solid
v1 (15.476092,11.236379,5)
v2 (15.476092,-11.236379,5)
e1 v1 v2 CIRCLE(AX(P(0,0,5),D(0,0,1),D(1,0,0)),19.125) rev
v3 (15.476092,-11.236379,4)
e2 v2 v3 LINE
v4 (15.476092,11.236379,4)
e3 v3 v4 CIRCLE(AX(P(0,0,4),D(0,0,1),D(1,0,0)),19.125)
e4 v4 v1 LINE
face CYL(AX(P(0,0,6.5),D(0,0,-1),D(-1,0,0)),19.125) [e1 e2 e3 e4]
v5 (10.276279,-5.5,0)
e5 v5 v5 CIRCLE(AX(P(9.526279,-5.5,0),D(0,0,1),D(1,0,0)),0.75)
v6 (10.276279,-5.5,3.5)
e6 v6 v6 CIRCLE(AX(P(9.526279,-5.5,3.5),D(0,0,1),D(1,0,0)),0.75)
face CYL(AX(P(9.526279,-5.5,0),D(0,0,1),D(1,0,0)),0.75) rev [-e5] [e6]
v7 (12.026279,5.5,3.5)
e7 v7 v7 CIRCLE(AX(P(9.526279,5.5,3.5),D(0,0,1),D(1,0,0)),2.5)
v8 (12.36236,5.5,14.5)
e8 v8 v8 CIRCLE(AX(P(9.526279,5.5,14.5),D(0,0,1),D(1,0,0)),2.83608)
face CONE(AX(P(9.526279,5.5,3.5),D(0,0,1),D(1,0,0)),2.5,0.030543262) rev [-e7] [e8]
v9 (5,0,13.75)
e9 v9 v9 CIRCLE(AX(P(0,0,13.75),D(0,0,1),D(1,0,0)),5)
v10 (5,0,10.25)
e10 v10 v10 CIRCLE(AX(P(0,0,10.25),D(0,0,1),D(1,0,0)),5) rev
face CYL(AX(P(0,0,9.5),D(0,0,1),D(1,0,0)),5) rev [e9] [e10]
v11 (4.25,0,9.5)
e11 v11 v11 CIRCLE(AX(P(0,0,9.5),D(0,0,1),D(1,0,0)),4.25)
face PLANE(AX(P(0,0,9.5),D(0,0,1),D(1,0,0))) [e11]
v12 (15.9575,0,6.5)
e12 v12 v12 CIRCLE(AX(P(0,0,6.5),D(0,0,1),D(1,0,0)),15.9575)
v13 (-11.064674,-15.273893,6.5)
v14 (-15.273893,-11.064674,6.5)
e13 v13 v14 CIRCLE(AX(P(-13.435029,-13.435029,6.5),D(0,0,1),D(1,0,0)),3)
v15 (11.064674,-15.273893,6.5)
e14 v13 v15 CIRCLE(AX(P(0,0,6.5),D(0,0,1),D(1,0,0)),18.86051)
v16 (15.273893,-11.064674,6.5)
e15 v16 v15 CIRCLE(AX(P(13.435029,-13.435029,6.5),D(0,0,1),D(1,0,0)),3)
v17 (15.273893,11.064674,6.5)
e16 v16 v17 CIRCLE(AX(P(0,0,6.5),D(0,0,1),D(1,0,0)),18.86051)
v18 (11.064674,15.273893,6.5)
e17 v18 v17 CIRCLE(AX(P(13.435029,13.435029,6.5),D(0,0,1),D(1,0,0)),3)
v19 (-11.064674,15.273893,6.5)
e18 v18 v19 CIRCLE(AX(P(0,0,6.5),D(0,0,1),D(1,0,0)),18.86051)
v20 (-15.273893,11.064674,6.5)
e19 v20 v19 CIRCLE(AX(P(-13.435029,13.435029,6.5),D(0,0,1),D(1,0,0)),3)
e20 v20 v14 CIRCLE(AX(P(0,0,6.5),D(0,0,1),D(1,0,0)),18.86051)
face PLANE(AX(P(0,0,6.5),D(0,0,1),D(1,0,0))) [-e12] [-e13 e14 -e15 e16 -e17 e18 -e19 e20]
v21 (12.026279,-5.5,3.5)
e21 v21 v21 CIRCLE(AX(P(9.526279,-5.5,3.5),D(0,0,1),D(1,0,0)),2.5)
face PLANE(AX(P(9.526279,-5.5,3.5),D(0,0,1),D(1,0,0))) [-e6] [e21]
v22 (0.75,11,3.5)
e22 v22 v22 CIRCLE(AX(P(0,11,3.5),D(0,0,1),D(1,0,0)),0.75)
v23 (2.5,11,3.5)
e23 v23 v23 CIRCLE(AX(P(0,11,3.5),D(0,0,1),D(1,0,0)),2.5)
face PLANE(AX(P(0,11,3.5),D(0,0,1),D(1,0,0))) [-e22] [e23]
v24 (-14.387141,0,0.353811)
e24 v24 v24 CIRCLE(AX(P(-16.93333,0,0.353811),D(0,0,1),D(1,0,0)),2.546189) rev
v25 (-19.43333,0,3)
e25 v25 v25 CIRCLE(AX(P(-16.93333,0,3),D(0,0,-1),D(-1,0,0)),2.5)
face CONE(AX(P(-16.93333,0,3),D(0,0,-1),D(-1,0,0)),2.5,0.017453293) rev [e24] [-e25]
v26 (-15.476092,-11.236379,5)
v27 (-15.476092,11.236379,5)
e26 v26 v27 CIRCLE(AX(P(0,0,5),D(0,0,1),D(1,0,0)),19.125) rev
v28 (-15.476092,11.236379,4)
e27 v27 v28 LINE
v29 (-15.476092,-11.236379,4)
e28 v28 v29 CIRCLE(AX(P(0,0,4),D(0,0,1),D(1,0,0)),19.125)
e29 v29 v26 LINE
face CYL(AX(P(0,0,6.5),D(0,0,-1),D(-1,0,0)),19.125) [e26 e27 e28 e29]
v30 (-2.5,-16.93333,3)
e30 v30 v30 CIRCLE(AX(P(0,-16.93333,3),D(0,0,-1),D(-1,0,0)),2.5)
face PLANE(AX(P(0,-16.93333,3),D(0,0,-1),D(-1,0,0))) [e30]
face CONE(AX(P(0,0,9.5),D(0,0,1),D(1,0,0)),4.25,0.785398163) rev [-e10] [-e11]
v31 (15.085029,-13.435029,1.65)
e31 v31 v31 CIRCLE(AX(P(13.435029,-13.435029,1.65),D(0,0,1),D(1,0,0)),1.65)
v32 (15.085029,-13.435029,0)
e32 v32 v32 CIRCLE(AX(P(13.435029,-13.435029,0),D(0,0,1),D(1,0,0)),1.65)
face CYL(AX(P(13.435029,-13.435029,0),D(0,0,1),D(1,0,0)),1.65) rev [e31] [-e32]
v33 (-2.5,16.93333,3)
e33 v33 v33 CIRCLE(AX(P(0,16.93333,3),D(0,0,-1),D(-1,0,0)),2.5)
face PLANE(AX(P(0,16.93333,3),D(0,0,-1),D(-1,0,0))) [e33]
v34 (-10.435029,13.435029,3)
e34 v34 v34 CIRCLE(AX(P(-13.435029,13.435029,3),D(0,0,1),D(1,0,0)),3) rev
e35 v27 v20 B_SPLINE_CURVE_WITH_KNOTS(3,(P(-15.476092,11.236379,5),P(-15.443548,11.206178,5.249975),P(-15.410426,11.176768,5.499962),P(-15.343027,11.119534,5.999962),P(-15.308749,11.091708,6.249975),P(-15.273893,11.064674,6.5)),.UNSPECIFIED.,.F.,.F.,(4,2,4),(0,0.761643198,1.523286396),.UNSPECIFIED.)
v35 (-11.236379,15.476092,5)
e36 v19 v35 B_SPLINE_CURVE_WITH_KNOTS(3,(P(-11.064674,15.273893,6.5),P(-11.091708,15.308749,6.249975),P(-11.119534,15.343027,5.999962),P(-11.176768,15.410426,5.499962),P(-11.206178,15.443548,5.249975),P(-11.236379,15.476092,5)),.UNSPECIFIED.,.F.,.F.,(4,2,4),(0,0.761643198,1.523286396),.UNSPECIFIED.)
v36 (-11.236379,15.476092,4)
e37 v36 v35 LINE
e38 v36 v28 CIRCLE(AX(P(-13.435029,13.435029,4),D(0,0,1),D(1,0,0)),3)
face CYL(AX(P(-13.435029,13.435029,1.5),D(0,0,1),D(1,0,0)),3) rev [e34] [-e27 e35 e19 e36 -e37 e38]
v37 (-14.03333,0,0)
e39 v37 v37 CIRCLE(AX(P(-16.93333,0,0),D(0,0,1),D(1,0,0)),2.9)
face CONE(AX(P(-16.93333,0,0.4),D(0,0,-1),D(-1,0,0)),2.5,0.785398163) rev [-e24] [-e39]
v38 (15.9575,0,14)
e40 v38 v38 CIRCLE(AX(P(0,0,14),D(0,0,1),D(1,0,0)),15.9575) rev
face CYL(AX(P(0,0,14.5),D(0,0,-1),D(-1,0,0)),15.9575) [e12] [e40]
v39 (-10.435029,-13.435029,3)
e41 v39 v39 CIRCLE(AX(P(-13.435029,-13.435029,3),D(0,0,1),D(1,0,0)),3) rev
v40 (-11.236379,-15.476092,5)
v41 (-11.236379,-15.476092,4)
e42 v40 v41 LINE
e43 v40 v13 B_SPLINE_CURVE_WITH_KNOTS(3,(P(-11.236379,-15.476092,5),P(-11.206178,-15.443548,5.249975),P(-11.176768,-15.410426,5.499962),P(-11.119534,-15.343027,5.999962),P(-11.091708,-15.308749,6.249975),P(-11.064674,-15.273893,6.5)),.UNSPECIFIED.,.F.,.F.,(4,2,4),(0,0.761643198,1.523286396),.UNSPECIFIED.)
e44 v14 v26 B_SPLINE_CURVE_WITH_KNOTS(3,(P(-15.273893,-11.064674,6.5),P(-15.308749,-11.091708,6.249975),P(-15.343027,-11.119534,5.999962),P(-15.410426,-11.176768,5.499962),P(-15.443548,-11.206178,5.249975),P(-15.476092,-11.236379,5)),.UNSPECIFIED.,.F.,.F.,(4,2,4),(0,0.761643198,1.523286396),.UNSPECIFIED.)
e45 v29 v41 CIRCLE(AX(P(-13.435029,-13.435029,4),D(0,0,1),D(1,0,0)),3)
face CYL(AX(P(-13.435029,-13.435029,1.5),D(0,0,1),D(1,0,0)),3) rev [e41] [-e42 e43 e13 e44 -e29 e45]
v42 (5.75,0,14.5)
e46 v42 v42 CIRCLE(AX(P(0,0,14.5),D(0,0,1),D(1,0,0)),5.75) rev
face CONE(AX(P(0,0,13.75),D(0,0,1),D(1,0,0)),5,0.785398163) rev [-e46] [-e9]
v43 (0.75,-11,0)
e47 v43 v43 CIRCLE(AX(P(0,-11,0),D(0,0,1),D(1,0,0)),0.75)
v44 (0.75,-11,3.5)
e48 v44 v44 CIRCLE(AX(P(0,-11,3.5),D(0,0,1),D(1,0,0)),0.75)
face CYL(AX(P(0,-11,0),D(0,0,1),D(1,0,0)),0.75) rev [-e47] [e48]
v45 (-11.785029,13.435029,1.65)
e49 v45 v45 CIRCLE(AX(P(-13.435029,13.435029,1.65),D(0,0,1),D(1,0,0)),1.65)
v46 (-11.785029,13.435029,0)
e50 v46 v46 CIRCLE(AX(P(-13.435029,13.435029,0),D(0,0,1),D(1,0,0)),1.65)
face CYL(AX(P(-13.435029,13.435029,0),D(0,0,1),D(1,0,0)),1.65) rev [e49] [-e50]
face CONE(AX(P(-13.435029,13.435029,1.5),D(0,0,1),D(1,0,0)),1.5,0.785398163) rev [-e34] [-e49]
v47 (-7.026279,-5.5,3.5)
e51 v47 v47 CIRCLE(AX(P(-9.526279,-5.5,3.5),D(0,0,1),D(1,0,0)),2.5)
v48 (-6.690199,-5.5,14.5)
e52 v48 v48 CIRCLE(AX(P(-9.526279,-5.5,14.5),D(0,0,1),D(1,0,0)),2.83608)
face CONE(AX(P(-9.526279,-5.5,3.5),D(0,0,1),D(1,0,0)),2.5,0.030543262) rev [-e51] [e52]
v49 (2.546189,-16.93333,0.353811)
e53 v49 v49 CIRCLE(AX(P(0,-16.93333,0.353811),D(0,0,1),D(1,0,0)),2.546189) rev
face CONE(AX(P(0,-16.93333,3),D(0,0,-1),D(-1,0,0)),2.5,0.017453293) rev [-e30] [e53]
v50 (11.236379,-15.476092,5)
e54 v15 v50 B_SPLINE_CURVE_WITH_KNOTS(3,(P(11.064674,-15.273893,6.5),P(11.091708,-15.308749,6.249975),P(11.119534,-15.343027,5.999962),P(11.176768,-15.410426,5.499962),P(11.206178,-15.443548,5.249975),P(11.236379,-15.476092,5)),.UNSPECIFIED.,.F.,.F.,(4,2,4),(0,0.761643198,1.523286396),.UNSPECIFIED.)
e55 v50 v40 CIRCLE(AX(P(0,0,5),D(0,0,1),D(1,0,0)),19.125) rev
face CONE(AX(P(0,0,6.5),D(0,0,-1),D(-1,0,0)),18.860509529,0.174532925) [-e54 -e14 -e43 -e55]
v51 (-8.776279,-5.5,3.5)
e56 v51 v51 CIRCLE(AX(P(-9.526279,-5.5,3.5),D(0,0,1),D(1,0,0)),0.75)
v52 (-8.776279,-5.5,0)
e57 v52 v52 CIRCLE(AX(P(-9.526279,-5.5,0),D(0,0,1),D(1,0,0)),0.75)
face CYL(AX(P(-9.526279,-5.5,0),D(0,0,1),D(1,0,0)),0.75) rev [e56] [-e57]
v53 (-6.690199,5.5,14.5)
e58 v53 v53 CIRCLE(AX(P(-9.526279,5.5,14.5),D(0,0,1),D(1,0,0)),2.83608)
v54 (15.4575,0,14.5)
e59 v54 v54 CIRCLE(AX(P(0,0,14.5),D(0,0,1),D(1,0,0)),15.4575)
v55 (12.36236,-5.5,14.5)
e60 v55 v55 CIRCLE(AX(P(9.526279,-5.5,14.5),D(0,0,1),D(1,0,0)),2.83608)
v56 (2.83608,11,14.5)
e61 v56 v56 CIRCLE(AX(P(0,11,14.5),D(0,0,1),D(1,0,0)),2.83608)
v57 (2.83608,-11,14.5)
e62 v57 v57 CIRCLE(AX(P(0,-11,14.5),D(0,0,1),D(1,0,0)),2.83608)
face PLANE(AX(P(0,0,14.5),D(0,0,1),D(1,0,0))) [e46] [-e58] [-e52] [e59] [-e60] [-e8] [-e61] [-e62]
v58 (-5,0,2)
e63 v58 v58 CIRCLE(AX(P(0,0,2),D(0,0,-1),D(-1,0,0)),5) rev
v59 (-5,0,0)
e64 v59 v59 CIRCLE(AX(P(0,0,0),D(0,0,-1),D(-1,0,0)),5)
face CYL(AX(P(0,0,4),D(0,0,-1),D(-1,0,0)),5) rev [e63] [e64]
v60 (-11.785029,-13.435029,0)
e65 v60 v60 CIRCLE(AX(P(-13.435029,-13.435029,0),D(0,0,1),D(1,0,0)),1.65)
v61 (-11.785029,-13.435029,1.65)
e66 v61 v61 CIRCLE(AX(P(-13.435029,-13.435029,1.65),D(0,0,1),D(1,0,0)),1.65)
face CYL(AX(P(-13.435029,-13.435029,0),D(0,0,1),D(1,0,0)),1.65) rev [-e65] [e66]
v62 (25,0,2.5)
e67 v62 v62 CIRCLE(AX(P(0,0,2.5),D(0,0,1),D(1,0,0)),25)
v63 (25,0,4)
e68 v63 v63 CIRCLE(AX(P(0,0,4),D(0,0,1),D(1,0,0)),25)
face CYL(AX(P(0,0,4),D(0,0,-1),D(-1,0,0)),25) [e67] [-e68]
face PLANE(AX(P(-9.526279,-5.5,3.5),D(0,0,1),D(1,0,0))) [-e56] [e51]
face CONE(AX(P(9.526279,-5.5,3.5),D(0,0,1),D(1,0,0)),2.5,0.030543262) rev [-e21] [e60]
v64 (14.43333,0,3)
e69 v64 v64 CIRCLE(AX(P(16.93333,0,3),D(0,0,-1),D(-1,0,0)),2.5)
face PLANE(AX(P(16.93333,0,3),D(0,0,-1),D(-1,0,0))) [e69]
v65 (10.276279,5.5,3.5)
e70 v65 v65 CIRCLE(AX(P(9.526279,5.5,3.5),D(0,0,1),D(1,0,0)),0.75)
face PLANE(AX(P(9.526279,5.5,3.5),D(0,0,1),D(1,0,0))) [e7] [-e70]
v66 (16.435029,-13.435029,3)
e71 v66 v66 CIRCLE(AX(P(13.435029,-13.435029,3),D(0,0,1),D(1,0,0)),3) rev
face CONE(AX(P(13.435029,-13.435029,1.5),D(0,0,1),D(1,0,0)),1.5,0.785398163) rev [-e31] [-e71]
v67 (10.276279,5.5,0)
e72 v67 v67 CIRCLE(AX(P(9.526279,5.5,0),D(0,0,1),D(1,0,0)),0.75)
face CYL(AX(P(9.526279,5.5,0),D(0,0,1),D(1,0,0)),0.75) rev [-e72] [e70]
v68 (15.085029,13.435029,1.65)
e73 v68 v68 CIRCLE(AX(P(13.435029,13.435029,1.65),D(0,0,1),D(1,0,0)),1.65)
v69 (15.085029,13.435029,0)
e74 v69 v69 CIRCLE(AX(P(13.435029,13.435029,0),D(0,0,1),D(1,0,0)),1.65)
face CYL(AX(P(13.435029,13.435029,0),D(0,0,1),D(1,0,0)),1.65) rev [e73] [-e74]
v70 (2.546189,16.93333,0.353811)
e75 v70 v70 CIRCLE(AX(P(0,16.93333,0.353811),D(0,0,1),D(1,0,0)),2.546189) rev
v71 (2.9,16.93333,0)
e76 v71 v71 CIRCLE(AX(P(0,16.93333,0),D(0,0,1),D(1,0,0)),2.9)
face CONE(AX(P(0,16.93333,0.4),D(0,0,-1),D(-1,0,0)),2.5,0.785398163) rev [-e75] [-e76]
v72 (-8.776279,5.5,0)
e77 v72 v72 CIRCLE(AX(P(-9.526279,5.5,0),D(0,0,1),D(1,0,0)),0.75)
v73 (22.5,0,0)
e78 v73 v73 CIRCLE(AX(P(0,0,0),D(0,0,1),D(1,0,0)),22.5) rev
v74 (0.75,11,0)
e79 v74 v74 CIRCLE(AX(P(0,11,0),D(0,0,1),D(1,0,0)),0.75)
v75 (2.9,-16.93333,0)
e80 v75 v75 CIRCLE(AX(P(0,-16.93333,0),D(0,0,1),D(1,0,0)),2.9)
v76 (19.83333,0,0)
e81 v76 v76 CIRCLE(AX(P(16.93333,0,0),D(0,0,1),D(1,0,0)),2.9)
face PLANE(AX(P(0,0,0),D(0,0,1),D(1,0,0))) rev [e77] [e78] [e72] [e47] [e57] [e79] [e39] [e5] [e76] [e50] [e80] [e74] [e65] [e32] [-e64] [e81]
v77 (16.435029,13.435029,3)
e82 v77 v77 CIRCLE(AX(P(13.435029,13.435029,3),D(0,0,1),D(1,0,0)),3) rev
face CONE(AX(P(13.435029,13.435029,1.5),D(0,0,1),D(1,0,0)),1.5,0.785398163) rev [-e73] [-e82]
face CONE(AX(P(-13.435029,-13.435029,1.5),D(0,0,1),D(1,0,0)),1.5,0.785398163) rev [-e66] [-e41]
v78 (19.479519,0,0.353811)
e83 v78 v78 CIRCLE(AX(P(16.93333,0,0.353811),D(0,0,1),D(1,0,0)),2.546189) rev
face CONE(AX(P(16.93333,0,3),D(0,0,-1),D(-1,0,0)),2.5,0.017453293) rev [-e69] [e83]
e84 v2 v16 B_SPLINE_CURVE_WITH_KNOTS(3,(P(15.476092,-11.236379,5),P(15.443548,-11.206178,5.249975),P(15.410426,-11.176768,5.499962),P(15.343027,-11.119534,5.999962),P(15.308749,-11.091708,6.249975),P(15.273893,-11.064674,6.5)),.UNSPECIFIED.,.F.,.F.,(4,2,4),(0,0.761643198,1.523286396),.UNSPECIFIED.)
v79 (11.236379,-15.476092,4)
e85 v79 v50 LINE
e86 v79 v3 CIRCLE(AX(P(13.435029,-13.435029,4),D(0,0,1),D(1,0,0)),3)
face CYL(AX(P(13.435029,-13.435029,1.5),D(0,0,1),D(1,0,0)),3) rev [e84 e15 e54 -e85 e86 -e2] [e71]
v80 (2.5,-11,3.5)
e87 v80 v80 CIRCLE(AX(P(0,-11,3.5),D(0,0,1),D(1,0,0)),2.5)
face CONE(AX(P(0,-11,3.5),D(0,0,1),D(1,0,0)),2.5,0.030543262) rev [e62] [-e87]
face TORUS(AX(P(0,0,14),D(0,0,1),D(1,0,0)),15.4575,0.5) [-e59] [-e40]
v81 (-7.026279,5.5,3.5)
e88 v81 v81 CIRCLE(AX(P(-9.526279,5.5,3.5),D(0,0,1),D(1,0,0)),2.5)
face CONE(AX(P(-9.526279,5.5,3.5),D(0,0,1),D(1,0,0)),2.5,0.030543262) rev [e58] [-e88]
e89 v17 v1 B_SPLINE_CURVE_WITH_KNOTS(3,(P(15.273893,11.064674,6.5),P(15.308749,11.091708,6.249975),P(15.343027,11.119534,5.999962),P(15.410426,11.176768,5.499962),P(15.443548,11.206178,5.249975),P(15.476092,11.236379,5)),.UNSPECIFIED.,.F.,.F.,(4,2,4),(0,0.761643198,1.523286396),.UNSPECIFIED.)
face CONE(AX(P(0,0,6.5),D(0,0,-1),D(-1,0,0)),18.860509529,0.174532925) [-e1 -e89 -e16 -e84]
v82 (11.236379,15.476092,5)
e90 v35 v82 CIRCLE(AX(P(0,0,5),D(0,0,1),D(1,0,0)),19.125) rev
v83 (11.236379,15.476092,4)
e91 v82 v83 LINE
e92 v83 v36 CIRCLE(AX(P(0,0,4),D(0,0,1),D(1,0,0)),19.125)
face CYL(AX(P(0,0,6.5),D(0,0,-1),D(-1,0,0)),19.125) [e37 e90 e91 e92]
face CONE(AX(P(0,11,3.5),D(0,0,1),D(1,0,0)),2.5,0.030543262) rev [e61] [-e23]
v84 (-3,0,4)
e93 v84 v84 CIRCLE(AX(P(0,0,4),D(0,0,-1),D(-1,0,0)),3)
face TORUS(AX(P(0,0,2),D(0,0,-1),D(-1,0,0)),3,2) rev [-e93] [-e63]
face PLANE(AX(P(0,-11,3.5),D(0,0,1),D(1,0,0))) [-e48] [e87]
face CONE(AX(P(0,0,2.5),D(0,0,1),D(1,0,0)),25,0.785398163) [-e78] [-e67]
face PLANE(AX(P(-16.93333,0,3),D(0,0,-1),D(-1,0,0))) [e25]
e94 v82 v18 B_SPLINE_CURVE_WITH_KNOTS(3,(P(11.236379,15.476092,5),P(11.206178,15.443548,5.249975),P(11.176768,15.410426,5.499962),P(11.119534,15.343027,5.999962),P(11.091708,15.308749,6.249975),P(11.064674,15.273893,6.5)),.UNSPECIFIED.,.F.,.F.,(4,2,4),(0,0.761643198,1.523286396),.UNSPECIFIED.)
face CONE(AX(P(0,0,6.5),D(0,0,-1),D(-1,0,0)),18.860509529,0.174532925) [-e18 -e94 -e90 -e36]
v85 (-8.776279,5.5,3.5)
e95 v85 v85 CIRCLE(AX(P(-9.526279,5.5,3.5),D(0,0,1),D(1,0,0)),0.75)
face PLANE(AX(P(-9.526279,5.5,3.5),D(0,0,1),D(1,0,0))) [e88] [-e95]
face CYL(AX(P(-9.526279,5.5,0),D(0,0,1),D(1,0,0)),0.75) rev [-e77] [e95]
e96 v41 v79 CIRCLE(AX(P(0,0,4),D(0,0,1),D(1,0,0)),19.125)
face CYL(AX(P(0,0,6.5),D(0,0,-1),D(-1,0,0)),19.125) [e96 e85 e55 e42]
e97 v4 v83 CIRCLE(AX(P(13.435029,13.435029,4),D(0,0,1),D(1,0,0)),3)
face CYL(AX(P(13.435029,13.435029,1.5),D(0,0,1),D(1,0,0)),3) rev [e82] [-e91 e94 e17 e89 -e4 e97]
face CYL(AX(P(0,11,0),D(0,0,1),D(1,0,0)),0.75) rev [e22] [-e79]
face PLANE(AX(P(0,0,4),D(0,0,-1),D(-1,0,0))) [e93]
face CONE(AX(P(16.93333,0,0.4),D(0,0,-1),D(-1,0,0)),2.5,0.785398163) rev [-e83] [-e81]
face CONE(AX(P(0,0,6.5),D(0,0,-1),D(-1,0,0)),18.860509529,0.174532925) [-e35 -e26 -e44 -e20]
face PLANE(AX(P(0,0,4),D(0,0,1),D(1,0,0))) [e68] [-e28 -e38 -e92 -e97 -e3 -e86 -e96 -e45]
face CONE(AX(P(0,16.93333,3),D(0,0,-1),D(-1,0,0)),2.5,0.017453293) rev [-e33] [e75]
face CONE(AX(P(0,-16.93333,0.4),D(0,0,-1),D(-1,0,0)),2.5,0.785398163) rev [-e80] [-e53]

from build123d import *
from OCP.BRepFilletAPI import BRepFilletAPI_MakeChamfer

# Parameters (mm, degrees)
SKETCH1_R               = 25
BOSS_EXTRUDE1_DEPTH     = 4
SKETCH2_R               = 19.125
BOSS_EXTRUDE2_DEPTH     = 2.5
SKETCH3_R               = 15.9575
BOSS_EXTRUDE3_DEPTH     = 8
SKETCH4_R               = 2.5
CUT_EXTRUDE1_DEPTH      = 3
SKETCH7_R               = 2.5
CUT_EXTRUDE3_DEPTH      = 11
SKETCH8_R               = 5
CUT_EXTRUDE4_DEPTH      = 4
CHAMFER1_SIZE           = 2.5
FILLET1_R               = 0.5
CUT_EXTRUDE7_DEPTH      = 37.881567212
CUT_EXTRUDE7_DEPTH_BACK = 37.881567212
SKETCH11_R              = 1.65
SKETCH12_R              = 3
CUT_EXTRUDE8_DEPTH      = 5
CUT_EXTRUDE11_START     = -5
SKETCH15_R              = 5
CUT_EXTRUDE11_DEPTH     = 5
CHAMFER2_SIZE           = 1.5
FILLET2_R               = 2
CHAMFER3_SIZE           = 1.5
CHAMFER3_SIZE2          = 0.264490471
CHAMFER4_SIZE           = 0.75
CHAMFER5_SIZE           = 0.75
SKETCH16_R              = 0.75
CUT_EXTRUDE12_DEPTH     = 38.027017163
CHAMFER6_SIZE           = 0.4
DRAFT1_ANGLE            = 1.75
DRAFT2_ANGLE            = 1


with BuildPart() as part:
    # Sketch1 → Boss-Extrude1 (new body)
    with BuildSketch(Plane.XY):
        Circle(SKETCH1_R)
    extrude(amount=BOSS_EXTRUDE1_DEPTH)

    # Sketch2 → Boss-Extrude2 (add)
    with BuildSketch(Plane.XY.offset(4)):
        Circle(SKETCH2_R)
    extrude(amount=BOSS_EXTRUDE2_DEPTH)

    # Sketch3 → Boss-Extrude3 (add)
    with BuildSketch(Plane.XY.offset(6.5)):
        Circle(SKETCH3_R)
    extrude(amount=BOSS_EXTRUDE3_DEPTH)

    # Sketch4 → Cut-Extrude1 (cut)
    with BuildSketch(Plane(origin=(0, 0, 0), x_dir=(-1, 0, 0), z_dir=(0, 0, -1))):
        with Locations((0, 16.93333)):
            Circle(SKETCH4_R)
        with Locations((16.93333, 0)):
            Circle(SKETCH4_R)
        with Locations((0, -16.93333)):
            Circle(SKETCH4_R)
        with Locations((-16.93333, 0)):
            Circle(SKETCH4_R)
    extrude(amount=-CUT_EXTRUDE1_DEPTH, mode=Mode.SUBTRACT)

    # Sketch7 → Cut-Extrude3 (cut)
    with BuildSketch(Plane.XY.offset(14.5)):
        with Locations((0, 11)):
            Circle(SKETCH7_R)
        with Locations((9.526279442, 5.5)):
            Circle(SKETCH7_R)
        with Locations((9.526279442, -5.5)):
            Circle(SKETCH7_R)
        with Locations((0, -11)):
            Circle(SKETCH7_R)
        with Locations((-9.526279442, -5.5)):
            Circle(SKETCH7_R)
        with Locations((-9.526279442, 5.5)):
            Circle(SKETCH7_R)
    extrude(amount=-CUT_EXTRUDE3_DEPTH, mode=Mode.SUBTRACT)

    # Sketch8 → Cut-Extrude4 (cut)
    with BuildSketch(Plane(origin=(0, 0, 0), x_dir=(-1, 0, 0), z_dir=(0, 0, -1))):
        Circle(SKETCH8_R)
    extrude(amount=-CUT_EXTRUDE4_DEPTH, mode=Mode.SUBTRACT)

    # Chamfer1
    chamfer1_edges = [part.edges().sort_by_distance(p)[0] for p in [
        (-25, 0, 0),
    ]]
    chamfer(chamfer1_edges, length=CHAMFER1_SIZE)

    # Fillet1
    fillet1_edges = [part.edges().sort_by_distance(p)[0] for p in [
        (-15.9575, 0, 14.5),
    ]]
    fillet(fillet1_edges, radius=FILLET1_R)

    # Sketch11 → Cut-Extrude7 (cut, two sides: drawn at the far end of the back side and taken through both)
    with BuildSketch(Plane.XY.offset(4).offset(-CUT_EXTRUDE7_DEPTH_BACK)):
        with Locations((-13.435028843, 13.435028843)):
            Circle(SKETCH11_R)
        with Locations((13.435028843, 13.435028843)):
            Circle(SKETCH11_R)
        with Locations((13.435028843, -13.435028843)):
            Circle(SKETCH11_R)
        with Locations((-13.435028843, -13.435028843)):
            Circle(SKETCH11_R)
    extrude(amount=CUT_EXTRUDE7_DEPTH + CUT_EXTRUDE7_DEPTH_BACK, mode=Mode.SUBTRACT)

    # Sketch12 → Cut-Extrude8 (cut)
    with BuildSketch(Plane.XY.offset(6.5)):
        with Locations((-13.435028843, 13.435028843)):
            Circle(SKETCH12_R)
        with Locations((13.435028843, 13.435028843)):
            Circle(SKETCH12_R)
        with Locations((13.435028843, -13.435028843)):
            Circle(SKETCH12_R)
        with Locations((-13.435028843, -13.435028843)):
            Circle(SKETCH12_R)
    extrude(amount=-CUT_EXTRUDE8_DEPTH, mode=Mode.SUBTRACT)

    # Sketch15 → Cut-Extrude11 (cut)
    with BuildSketch(Plane.XY.offset(14.5).offset(CUT_EXTRUDE11_START)):
        with Locations(Location((0, 0, 0), (0, 0, 180))):
            Circle(SKETCH15_R)
    extrude(amount=CUT_EXTRUDE11_DEPTH, mode=Mode.SUBTRACT)

    # Chamfer2
    # the kernel refuses this chamfer: 1.5 mm, written as the material it adds along each edge
    with BuildSketch(Plane(origin=(13.435028843, -13.435028843, 1.5), x_dir=(1, 0, 0), z_dir=(0, -1, 0))) as chamfer2_piece_1_section:
        Polygon((3, CHAMFER2_SIZE), (3 - CHAMFER2_SIZE, 0), (3, 0), align=None)
    chamfer2_piece_1 = revolve(axis=Axis((13.435028843, -13.435028843, 1.5), (0, 0, 1)), mode=Mode.PRIVATE)
    chamfer2_piece_1 = chamfer2_piece_1 - Plane(origin=(13.435028843, -13.435028843, 2.327258636), x_dir=(1, 0, 0), z_dir=(0, 0, 1)) * Cylinder(1.65, 13, mode=Mode.PRIVATE)
    add(chamfer2_piece_1)
    with BuildSketch(Plane(origin=(-13.435028843, -13.435028843, 1.5), x_dir=(1, 0, 0), z_dir=(0, -1, 0))) as chamfer2_piece_2_section:
        Polygon((3, CHAMFER2_SIZE), (3 - CHAMFER2_SIZE, 0), (3, 0), align=None)
    chamfer2_piece_2 = revolve(axis=Axis((-13.435028843, -13.435028843, 1.5), (0, 0, 1)), mode=Mode.PRIVATE)
    chamfer2_piece_2 = chamfer2_piece_2 - Plane(origin=(-13.435028843, -13.435028843, 2.327258636), x_dir=(1, 0, 0), z_dir=(0, 0, 1)) * Cylinder(1.65, 12, mode=Mode.PRIVATE)
    add(chamfer2_piece_2)
    with BuildSketch(Plane(origin=(13.435028843, 13.435028843, 1.5), x_dir=(1, 0, 0), z_dir=(0, -1, 0))) as chamfer2_piece_3_section:
        Polygon((3, CHAMFER2_SIZE), (3 - CHAMFER2_SIZE, 0), (3, 0), align=None)
    chamfer2_piece_3 = revolve(axis=Axis((13.435028843, 13.435028843, 1.5), (0, 0, 1)), mode=Mode.PRIVATE)
    chamfer2_piece_3 = chamfer2_piece_3 - Plane(origin=(13.435028843, 13.435028843, 2.327258636), x_dir=(1, 0, 0), z_dir=(0, 0, 1)) * Cylinder(1.65, 13, mode=Mode.PRIVATE)
    add(chamfer2_piece_3)
    with BuildSketch(Plane(origin=(-13.435028843, 13.435028843, 1.5), x_dir=(1, 0, 0), z_dir=(0, -1, 0))) as chamfer2_piece_4_section:
        Polygon((3, CHAMFER2_SIZE), (3 - CHAMFER2_SIZE, 0), (3, 0), align=None)
    chamfer2_piece_4 = revolve(axis=Axis((-13.435028843, 13.435028843, 1.5), (0, 0, 1)), mode=Mode.PRIVATE)
    chamfer2_piece_4 = chamfer2_piece_4 - Plane(origin=(-13.435028843, 13.435028843, 2.327258636), x_dir=(1, 0, 0), z_dir=(0, 0, 1)) * Cylinder(1.65, 13, mode=Mode.PRIVATE)
    add(chamfer2_piece_4)

    # Fillet2
    fillet2_edges = [part.edges().sort_by_distance(p)[0] for p in [
        (5, 0, 4),
    ]]
    fillet(fillet2_edges, radius=FILLET2_R)

    # Chamfer3: one chamfer whose edges measure the first distance from different faces: ONE call of the kernel's chamfer builder (chamfer() names one face for all edges)
    chamfer3_edges_1 = [part.edges().sort_by_distance(p)[0] for p in [
        (0, -19.125, 6.5),
    ]]
    chamfer3_side_1 = [part.faces().sort_by_distance(p)[0] for p in [
        (0, -19.125, 5.25),
    ]]
    chamfer3_edges_2 = [part.edges().sort_by_distance(p)[0] for p in [
        (19.125, 0, 6.5),
    ]]
    chamfer3_side_2 = [part.faces().sort_by_distance(p)[0] for p in [
        (19.125, 0, 5.25),
    ]]
    chamfer3_edges_3 = [part.edges().sort_by_distance(p)[0] for p in [
        (0, 19.125, 6.5),
    ]]
    chamfer3_side_3 = [part.faces().sort_by_distance(p)[0] for p in [
        (0, 19.125, 5.25),
    ]]
    chamfer3_edges_4 = [part.edges().sort_by_distance(p)[0] for p in [
        (-19.125, 0, 6.5),
    ]]
    chamfer3_side_4 = [part.faces().sort_by_distance(p)[0] for p in [
        (-19.125, 0, 5.25),
    ]]
    chamfer3 = BRepFilletAPI_MakeChamfer(part.part.solid().wrapped)
    for e in chamfer3_edges_1:
        chamfer3.Add(CHAMFER3_SIZE, CHAMFER3_SIZE2, e.wrapped, chamfer3_side_1[0].wrapped)  # the first distance lies on this face
    for e in chamfer3_edges_2:
        chamfer3.Add(CHAMFER3_SIZE, CHAMFER3_SIZE2, e.wrapped, chamfer3_side_2[0].wrapped)  # the first distance lies on this face
    for e in chamfer3_edges_3:
        chamfer3.Add(CHAMFER3_SIZE, CHAMFER3_SIZE2, e.wrapped, chamfer3_side_3[0].wrapped)  # the first distance lies on this face
    for e in chamfer3_edges_4:
        chamfer3.Add(CHAMFER3_SIZE, CHAMFER3_SIZE2, e.wrapped, chamfer3_side_4[0].wrapped)  # the first distance lies on this face
    add(Compound.cast(chamfer3.Shape()), mode=Mode.REPLACE)

    # Chamfer4
    chamfer4_edges = [part.edges().sort_by_distance(p)[0] for p in [
        (5, 0, 9.5),
    ]]
    chamfer(chamfer4_edges, length=CHAMFER4_SIZE)

    # Chamfer5
    chamfer5_edges = [part.edges().sort_by_distance(p)[0] for p in [
        (5, 0, 14.5),
    ]]
    chamfer(chamfer5_edges, length=CHAMFER5_SIZE)

    # Sketch16 → Cut-Extrude12 (cut, through all)
    with BuildSketch(Plane.XY.offset(3.5)):
        with Locations((-9.526279442, -5.5)):
            Circle(SKETCH16_R)
        with Locations((-9.526279442, 5.5)):
            Circle(SKETCH16_R)
        with Locations((0, 11)):
            Circle(SKETCH16_R)
        with Locations((9.526279442, 5.5)):
            Circle(SKETCH16_R)
        with Locations((9.526279442, -5.5)):
            Circle(SKETCH16_R)
        with Locations((0, -11)):
            Circle(SKETCH16_R)
    extrude(amount=-CUT_EXTRUDE12_DEPTH, mode=Mode.SUBTRACT)

    # Chamfer6
    chamfer6_edges = [part.edges().sort_by_distance(p)[0] for p in [
        (2.5, 16.93333, 0),
        (-14.43333, 0, 0),
        (2.5, -16.93333, 0),
        (19.43333, 0, 0),
    ]]
    chamfer(chamfer6_edges, length=CHAMFER6_SIZE)

    # Draft1
    draft1_faces = [part.faces().sort_by_distance(p)[0] for p in [
        (7.026279442, 5.5, 9),
        (-2.5, 11, 9),
        (-12.026279442, 5.5, 9),
        (-12.026279442, -5.5, 9),
        (-2.5, -11, 9),
        (7.026279442, -5.5, 9),
    ]]
    draft(draft1_faces, Plane(origin=(9.526279442, -5.5, 3.5), x_dir=(1, 0, 0), z_dir=(0, 0, 1)), DRAFT1_ANGLE)

    # Draft2
    draft2_faces = [part.faces().sort_by_distance(p)[0] for p in [
        (2.5, -16.93333, 1.7),
        (-14.43333, 0, 1.7),
        (19.43333, 0, 1.7),
        (2.5, 16.93333, 1.7),
    ]]
    draft(draft2_faces, Plane(origin=(0, 16.93333, 3), x_dir=(-1, 0, 0), z_dir=(0, 0, -1)), DRAFT2_ANGLE)


solid = part.part
